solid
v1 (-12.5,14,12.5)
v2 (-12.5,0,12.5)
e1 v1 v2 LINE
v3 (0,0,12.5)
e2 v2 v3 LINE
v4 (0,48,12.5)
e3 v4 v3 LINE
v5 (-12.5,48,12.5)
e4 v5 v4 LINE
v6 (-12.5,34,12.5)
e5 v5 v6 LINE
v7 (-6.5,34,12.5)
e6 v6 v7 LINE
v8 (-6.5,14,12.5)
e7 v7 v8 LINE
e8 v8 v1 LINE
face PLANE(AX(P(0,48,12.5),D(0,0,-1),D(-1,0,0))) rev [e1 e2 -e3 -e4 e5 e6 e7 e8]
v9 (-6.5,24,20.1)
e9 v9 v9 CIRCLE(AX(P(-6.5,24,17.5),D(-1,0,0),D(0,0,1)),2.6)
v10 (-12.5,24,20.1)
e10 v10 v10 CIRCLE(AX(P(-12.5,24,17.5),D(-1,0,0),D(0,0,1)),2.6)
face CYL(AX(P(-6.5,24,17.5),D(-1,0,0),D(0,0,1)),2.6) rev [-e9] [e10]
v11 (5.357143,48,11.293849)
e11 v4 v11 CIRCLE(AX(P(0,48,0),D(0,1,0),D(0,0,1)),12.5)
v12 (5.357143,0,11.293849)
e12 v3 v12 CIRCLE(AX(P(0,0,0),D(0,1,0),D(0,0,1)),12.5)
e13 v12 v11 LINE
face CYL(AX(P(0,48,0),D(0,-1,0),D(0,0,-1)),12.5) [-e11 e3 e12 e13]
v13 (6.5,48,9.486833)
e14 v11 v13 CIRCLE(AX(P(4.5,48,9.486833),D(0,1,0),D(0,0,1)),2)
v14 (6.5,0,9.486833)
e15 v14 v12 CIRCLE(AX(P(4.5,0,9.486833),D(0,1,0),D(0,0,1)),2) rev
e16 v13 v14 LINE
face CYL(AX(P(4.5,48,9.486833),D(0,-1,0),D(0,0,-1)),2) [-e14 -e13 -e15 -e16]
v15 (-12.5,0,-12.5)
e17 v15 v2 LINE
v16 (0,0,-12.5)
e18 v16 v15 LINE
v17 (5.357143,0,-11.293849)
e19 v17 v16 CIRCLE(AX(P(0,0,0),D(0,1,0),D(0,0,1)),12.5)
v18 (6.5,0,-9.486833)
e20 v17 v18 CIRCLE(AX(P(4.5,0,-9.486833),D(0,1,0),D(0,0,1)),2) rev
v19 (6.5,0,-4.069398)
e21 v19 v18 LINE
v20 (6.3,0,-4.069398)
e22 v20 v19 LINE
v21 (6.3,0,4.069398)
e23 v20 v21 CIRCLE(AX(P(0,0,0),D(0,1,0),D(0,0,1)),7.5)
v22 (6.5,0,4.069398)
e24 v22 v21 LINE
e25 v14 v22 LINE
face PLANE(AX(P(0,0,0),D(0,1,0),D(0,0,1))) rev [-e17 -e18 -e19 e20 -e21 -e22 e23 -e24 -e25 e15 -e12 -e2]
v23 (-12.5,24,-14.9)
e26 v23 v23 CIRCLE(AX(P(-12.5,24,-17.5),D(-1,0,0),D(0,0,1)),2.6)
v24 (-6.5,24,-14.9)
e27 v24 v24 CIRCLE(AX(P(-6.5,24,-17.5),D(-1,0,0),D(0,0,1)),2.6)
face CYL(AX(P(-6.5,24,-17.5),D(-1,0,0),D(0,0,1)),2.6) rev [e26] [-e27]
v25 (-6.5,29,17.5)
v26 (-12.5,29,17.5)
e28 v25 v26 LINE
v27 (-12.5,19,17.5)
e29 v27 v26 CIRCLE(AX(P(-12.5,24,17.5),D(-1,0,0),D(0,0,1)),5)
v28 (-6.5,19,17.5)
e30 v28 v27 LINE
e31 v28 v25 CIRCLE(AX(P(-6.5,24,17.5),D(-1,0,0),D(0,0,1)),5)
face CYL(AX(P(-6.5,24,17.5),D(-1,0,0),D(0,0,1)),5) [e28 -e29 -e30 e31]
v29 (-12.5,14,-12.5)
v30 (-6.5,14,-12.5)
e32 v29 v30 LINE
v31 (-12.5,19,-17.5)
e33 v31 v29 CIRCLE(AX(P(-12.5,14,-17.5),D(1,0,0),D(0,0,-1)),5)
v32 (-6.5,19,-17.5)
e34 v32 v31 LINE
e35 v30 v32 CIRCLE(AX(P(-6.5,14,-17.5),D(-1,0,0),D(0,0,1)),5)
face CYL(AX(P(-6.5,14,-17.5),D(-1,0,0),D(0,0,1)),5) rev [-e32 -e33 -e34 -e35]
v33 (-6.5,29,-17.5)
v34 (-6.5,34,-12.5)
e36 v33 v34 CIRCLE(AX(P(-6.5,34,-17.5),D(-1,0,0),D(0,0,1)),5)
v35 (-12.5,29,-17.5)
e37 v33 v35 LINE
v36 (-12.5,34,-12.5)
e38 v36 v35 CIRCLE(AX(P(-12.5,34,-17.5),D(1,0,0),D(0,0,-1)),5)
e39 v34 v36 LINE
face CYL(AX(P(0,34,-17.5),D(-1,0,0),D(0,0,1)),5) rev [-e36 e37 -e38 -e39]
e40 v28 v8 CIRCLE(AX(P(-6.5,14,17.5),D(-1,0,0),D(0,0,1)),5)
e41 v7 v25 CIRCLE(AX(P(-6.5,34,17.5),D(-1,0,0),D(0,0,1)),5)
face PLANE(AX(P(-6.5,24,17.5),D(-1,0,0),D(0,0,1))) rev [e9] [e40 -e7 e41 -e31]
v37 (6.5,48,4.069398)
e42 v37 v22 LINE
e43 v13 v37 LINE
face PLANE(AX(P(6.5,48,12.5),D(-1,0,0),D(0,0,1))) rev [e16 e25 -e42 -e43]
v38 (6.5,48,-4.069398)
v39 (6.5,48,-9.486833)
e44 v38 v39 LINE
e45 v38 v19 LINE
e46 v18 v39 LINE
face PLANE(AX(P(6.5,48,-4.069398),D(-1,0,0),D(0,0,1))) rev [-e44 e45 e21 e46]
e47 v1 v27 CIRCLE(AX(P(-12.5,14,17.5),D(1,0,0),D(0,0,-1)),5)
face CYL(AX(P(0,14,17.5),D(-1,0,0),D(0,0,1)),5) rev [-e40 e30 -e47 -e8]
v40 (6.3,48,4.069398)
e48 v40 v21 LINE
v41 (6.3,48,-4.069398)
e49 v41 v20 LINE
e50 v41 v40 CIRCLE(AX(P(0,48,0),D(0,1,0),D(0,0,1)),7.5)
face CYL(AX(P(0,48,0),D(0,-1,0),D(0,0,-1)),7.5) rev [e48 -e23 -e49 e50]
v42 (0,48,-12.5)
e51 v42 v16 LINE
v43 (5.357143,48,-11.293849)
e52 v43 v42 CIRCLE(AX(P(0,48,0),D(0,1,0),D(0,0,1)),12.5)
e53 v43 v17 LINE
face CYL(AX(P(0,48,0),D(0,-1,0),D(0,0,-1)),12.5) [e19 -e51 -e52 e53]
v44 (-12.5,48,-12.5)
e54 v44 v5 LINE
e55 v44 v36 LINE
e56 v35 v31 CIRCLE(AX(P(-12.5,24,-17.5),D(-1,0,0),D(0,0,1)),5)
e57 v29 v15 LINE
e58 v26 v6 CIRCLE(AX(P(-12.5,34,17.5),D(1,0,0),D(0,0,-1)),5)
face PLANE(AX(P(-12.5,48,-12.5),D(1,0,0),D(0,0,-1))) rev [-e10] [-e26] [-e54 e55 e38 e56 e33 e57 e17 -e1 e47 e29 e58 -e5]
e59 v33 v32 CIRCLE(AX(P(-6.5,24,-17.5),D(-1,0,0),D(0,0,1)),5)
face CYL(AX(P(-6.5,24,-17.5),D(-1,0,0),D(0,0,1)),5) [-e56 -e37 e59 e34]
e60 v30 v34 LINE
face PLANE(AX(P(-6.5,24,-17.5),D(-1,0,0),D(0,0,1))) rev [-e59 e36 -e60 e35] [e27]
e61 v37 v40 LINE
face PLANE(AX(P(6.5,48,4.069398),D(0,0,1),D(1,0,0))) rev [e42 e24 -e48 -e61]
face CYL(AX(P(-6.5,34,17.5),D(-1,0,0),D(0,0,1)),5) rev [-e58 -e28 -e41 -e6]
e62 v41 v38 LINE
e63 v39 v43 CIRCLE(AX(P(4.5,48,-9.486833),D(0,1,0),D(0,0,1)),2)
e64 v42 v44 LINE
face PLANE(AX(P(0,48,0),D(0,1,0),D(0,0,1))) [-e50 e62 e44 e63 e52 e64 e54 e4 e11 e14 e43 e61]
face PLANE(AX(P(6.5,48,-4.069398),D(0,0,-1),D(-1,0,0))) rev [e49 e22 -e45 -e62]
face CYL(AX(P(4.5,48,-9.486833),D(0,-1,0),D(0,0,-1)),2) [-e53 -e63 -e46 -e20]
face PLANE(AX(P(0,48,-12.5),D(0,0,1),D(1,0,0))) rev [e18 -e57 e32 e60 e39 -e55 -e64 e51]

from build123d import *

# Parameters (mm, degrees)
SKETCH1_R           = 7.5
BOSS_EXTRUDE1_DEPTH = 48
BOSS_EXTRUDE2_DEPTH = 6
SKETCH3_R           = 2.6
CUT_EXTRUDE1_DEPTH  = 6
FILLET6_R           = 5
FILLET7_R           = 5
CUT_EXTRUDE4_DEPTH  = 55.465585465
FILLET9_R           = 2
FILLET11_R          = 2


with BuildPart() as part:
    # Sketch1 → Boss-Extrude1 (new body)
    with BuildSketch(Plane(origin=(0, 0, 0), x_dir=(1, 0, 0), z_dir=(0, 1, 0))):
        with BuildLine():
            Line((0, 12.5), (-12.5, 12.5))
            Line((-12.5, 12.5), (-12.5, -12.5))
            Line((-12.5, -12.5), (0, -12.5))
            ThreePointArc((0, -12.5), (12.5, 0), (0, 12.5))
        make_face()
        with Locations(Location((0, 0, 0), (0, 0, 270))):
            Circle(SKETCH1_R, mode=Mode.SUBTRACT)
    extrude(amount=BOSS_EXTRUDE1_DEPTH)

    # Sketch2 → Boss-Extrude2 (add)
    with BuildSketch(Plane.ZY.offset(12.5)):
        with BuildLine():
            Line((-17.5, 29), (-12.5, 29))
            Line((-12.5, 29), (-12.5, 19))
            Line((-12.5, 19), (-17.5, 19))
            ThreePointArc((-17.5, 19), (-22.5, 24), (-17.5, 29))
        make_face()
        with BuildLine():
            Line((17.5, 29), (12.5, 29))
            Line((12.5, 29), (12.5, 19))
            Line((12.5, 19), (17.5, 19))
            ThreePointArc((17.5, 19), (22.5, 24), (17.5, 29))
        make_face()
    extrude(amount=-BOSS_EXTRUDE2_DEPTH)

    # Sketch3 → Cut-Extrude1 (cut)
    with BuildSketch(Plane.ZY.offset(12.5)):
        with Locations((-17.5, 24)):
            Circle(SKETCH3_R)
        with Locations((17.5, 24)):
            Circle(SKETCH3_R)
    extrude(amount=-CUT_EXTRUDE1_DEPTH, mode=Mode.SUBTRACT)

    # Fillet6
    fillet6_edges = [part.edges().sort_by_distance(p)[0] for p in [
        (-9.5, 19, -12.5),
    ]]
    fillet(fillet6_edges, radius=FILLET6_R - 0.0001)  # a hair under: the kernel refuses the full size

    # Fillet7
    fillet7_edges = [part.edges().sort_by_distance(p)[0] for p in [
        (-9.5, 19, 12.5),
        (-9.5, 29, 12.5),
        (-9.5, 29, -12.5),
    ]]
    fillet(fillet7_edges, radius=FILLET7_R - 0.0001)  # a hair under: the kernel refuses the full size

    # Sketch5 → Cut-Extrude4 (cut, through all)
    with BuildSketch(Plane.XZ):
        Polygon((12.5, 12.5), (6.5, 12.5), (6.5, 4.06939799), (6.3, 4.06939799), (6.3, -4.06939799), (6.5, -4.06939799), (6.5, -12.5), (12.5, -12.5), align=None)
    extrude(amount=-CUT_EXTRUDE4_DEPTH, mode=Mode.SUBTRACT)

    # Fillet9
    fillet9_edges = [part.edges().sort_by_distance(p)[0] for p in [
        (6.5, 24, 10.677078252),
    ]]
    fillet(fillet9_edges, radius=FILLET9_R)

    # Fillet11
    fillet11_edges = [part.edges().sort_by_distance(p)[0] for p in [
        (6.5, 24, -10.677078252),
    ]]
    fillet(fillet11_edges, radius=FILLET11_R)


solid = part.part
